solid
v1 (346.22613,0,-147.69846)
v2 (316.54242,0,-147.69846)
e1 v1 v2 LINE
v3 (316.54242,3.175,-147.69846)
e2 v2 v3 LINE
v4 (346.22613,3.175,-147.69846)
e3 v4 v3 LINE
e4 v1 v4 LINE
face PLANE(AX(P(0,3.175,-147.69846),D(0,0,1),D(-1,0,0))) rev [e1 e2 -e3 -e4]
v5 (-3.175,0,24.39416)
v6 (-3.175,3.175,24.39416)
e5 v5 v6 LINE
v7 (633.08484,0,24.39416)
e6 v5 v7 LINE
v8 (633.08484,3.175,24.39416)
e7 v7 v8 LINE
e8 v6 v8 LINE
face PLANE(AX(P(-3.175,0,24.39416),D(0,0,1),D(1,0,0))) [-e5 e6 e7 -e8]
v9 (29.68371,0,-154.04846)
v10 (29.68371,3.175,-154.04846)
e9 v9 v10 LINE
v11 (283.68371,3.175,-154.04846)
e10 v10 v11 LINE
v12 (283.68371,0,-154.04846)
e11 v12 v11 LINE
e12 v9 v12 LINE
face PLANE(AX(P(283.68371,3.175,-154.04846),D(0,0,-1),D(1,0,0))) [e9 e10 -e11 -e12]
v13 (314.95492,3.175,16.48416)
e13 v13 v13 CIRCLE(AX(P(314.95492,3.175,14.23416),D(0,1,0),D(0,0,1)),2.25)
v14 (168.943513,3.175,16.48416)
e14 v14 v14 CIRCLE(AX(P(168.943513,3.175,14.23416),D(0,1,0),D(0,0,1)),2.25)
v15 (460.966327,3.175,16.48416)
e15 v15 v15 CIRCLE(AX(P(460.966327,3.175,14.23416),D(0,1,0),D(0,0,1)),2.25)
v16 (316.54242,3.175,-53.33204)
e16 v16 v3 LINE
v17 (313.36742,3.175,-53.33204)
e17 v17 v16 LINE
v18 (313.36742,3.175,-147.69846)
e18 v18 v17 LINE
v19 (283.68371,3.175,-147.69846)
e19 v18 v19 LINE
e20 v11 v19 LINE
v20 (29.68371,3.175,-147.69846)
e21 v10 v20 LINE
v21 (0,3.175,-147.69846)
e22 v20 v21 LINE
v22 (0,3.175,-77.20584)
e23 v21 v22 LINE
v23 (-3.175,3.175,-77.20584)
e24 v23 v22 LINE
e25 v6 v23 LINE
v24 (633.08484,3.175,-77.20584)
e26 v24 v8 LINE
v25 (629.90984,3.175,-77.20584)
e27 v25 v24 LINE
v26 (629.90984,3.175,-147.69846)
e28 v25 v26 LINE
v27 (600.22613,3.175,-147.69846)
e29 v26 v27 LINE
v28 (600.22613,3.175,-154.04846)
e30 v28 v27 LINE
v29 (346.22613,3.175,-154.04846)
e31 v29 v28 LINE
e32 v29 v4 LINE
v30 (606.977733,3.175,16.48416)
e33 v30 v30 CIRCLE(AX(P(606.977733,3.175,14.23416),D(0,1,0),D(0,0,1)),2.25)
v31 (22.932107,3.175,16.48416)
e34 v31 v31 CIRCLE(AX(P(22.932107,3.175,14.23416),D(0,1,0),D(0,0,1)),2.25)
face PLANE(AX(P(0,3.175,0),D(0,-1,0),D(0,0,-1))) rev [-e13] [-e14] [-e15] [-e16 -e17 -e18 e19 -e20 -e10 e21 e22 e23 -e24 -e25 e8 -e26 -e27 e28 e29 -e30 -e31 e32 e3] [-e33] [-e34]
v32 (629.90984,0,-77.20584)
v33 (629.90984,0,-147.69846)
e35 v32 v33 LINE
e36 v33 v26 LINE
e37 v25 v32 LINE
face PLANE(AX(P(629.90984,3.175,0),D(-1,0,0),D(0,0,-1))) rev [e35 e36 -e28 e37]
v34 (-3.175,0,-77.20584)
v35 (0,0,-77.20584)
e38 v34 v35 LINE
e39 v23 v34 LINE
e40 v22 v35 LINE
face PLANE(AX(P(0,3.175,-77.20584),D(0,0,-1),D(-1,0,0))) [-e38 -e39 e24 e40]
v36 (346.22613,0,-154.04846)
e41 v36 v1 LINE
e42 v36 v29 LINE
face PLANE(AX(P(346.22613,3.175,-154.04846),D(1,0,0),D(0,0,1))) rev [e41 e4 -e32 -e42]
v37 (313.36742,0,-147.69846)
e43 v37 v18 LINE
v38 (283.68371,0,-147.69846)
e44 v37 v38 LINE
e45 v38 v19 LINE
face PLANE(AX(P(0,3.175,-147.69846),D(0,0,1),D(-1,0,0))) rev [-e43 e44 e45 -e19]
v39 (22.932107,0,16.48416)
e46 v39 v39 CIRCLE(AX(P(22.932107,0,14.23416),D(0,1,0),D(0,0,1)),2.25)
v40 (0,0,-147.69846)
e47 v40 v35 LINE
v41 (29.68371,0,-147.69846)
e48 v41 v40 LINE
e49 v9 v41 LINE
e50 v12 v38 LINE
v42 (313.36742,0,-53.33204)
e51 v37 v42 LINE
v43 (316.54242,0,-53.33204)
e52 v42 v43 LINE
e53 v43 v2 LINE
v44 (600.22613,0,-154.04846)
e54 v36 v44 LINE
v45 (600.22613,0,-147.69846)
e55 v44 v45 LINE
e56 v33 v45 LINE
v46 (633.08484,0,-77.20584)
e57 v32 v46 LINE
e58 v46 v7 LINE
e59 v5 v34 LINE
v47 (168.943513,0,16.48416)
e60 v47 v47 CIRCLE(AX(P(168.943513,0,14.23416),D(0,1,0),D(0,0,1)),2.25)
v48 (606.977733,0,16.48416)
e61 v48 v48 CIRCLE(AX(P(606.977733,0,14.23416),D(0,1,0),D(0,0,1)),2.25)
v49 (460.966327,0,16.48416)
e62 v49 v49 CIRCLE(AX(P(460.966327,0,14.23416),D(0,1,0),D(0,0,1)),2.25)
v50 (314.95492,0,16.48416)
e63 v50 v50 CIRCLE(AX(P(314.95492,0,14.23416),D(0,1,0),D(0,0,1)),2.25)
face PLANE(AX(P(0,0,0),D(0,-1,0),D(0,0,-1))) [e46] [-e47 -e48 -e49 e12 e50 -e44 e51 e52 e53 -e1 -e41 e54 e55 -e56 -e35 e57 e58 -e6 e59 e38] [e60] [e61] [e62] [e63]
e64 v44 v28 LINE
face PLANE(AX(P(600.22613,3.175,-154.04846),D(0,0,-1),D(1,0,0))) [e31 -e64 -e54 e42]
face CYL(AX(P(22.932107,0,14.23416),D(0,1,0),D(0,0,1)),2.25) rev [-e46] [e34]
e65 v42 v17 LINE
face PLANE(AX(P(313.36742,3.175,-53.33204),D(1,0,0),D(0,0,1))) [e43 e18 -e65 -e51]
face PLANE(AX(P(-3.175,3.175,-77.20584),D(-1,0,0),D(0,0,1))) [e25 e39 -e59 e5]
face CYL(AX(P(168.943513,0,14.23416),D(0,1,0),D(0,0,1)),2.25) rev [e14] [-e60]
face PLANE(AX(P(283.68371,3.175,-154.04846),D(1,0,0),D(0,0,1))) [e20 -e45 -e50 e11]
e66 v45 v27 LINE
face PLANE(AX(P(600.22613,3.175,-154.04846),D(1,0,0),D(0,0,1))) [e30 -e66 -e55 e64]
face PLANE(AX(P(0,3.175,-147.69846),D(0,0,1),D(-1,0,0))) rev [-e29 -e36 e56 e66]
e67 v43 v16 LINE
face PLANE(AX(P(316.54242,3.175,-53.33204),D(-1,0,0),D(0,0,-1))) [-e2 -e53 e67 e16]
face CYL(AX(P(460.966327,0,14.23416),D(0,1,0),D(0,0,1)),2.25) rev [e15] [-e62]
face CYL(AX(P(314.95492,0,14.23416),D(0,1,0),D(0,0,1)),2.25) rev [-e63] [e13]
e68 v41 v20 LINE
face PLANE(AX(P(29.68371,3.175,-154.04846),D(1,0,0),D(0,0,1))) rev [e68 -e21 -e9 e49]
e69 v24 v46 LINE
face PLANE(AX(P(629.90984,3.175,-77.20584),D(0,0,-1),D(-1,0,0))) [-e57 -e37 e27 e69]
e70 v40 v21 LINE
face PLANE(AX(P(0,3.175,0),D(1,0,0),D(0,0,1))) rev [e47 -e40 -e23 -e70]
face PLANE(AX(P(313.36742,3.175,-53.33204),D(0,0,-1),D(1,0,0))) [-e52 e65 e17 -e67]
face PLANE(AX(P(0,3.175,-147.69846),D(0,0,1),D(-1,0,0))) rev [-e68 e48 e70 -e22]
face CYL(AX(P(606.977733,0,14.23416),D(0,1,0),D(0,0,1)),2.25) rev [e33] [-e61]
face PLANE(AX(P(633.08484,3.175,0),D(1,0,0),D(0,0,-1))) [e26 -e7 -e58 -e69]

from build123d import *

# Parameters (mm, degrees)
SKETCH1_W           = 629.90984
SKETCH1_H           = 147.69846
BOSS_EXTRUDE1_DEPTH = 3.175
SKETCH3_W           = 254
SKETCH3_H           = 3.175
BOSS_EXTRUDE2_DEPTH = 6.35
SKETCH4_W           = 3.175
SKETCH4_H           = 188.732840052
CUT_EXTRUDE1_DEPTH  = 3.175
SKETCH9_W           = 3.175
SKETCH9_H           = 77.20584
BOSS_EXTRUDE4_DEPTH = 3.175
SKETCH10_W          = 636.25984
SKETCH10_H          = 24.39416
BOSS_EXTRUDE5_DEPTH = 3.175
SKETCH13_R          = 2.25
CUT_EXTRUDE3_DEPTH  = 652.56536379


with BuildPart() as part:
    # Sketch1 → Boss-Extrude1 (new body)
    with BuildSketch(Plane(origin=(0, 0, 0), x_dir=(1, 0, 0), z_dir=(0, 1, 0))):
        with Locations((314.95492, 73.84923)):
            Rectangle(SKETCH1_W, SKETCH1_H)
    extrude(amount=BOSS_EXTRUDE1_DEPTH)

    # Sketch3 → Boss-Extrude2 (add)
    with BuildSketch(Plane(origin=(0, 0, -147.69846), x_dir=(-1, 0, 0), z_dir=(0, 0, -1))):
        with Locations((-473.22613, 1.5875)):
            Rectangle(SKETCH3_W, SKETCH3_H)
        with Locations((-156.68371, 1.5875)):
            Rectangle(SKETCH3_W, SKETCH3_H)
    extrude(amount=BOSS_EXTRUDE2_DEPTH)

    # Sketch4 → Cut-Extrude1 (cut)
    with BuildSketch(Plane(origin=(0, 3.175, 0), x_dir=(1, 0, 0), z_dir=(0, 1, 0))):
        with Locations((314.95492, 147.69846)):
            Rectangle(SKETCH4_W, SKETCH4_H)
    extrude(amount=-CUT_EXTRUDE1_DEPTH, mode=Mode.SUBTRACT)

    # Sketch9 → Boss-Extrude4 (add, through all)
    with BuildSketch(Plane.XZ):
        with Locations((-1.5875, -38.60292)):
            Rectangle(SKETCH9_W, SKETCH9_H)
        with Locations((631.49734, -38.60292)):
            Rectangle(SKETCH9_W, SKETCH9_H)
    extrude(amount=-BOSS_EXTRUDE4_DEPTH)

    # Sketch10 → Boss-Extrude5 (add, through all)
    with BuildSketch(Plane(origin=(0, 3.175, 0), x_dir=(1, 0, 0), z_dir=(0, 1, 0))):
        with Locations((314.95492, -12.19708)):
            Rectangle(SKETCH10_W, SKETCH10_H)
    extrude(amount=-BOSS_EXTRUDE5_DEPTH)

    # Sketch13 → Cut-Extrude3 (cut, through all)
    with BuildSketch(Plane(origin=(0, 3.175, 0), x_dir=(1, 0, 0), z_dir=(0, 1, 0))):
        with Locations(Location((606.977733219, -14.23416, 0), (0, 0, 270))):
            Circle(SKETCH13_R)
        with Locations(Location((460.966326609, -14.23416, 0), (0, 0, 270))):
            Circle(SKETCH13_R)
        with Locations(Location((314.95492, -14.23416, 0), (0, 0, 270))):
            Circle(SKETCH13_R)
        with Locations(Location((168.943513391, -14.23416, 0), (0, 0, 270))):
            Circle(SKETCH13_R)
        with Locations(Location((22.932106781, -14.23416, 0), (0, 0, 270))):
            Circle(SKETCH13_R)
    extrude(amount=-CUT_EXTRUDE3_DEPTH, mode=Mode.SUBTRACT)


solid = part.part
